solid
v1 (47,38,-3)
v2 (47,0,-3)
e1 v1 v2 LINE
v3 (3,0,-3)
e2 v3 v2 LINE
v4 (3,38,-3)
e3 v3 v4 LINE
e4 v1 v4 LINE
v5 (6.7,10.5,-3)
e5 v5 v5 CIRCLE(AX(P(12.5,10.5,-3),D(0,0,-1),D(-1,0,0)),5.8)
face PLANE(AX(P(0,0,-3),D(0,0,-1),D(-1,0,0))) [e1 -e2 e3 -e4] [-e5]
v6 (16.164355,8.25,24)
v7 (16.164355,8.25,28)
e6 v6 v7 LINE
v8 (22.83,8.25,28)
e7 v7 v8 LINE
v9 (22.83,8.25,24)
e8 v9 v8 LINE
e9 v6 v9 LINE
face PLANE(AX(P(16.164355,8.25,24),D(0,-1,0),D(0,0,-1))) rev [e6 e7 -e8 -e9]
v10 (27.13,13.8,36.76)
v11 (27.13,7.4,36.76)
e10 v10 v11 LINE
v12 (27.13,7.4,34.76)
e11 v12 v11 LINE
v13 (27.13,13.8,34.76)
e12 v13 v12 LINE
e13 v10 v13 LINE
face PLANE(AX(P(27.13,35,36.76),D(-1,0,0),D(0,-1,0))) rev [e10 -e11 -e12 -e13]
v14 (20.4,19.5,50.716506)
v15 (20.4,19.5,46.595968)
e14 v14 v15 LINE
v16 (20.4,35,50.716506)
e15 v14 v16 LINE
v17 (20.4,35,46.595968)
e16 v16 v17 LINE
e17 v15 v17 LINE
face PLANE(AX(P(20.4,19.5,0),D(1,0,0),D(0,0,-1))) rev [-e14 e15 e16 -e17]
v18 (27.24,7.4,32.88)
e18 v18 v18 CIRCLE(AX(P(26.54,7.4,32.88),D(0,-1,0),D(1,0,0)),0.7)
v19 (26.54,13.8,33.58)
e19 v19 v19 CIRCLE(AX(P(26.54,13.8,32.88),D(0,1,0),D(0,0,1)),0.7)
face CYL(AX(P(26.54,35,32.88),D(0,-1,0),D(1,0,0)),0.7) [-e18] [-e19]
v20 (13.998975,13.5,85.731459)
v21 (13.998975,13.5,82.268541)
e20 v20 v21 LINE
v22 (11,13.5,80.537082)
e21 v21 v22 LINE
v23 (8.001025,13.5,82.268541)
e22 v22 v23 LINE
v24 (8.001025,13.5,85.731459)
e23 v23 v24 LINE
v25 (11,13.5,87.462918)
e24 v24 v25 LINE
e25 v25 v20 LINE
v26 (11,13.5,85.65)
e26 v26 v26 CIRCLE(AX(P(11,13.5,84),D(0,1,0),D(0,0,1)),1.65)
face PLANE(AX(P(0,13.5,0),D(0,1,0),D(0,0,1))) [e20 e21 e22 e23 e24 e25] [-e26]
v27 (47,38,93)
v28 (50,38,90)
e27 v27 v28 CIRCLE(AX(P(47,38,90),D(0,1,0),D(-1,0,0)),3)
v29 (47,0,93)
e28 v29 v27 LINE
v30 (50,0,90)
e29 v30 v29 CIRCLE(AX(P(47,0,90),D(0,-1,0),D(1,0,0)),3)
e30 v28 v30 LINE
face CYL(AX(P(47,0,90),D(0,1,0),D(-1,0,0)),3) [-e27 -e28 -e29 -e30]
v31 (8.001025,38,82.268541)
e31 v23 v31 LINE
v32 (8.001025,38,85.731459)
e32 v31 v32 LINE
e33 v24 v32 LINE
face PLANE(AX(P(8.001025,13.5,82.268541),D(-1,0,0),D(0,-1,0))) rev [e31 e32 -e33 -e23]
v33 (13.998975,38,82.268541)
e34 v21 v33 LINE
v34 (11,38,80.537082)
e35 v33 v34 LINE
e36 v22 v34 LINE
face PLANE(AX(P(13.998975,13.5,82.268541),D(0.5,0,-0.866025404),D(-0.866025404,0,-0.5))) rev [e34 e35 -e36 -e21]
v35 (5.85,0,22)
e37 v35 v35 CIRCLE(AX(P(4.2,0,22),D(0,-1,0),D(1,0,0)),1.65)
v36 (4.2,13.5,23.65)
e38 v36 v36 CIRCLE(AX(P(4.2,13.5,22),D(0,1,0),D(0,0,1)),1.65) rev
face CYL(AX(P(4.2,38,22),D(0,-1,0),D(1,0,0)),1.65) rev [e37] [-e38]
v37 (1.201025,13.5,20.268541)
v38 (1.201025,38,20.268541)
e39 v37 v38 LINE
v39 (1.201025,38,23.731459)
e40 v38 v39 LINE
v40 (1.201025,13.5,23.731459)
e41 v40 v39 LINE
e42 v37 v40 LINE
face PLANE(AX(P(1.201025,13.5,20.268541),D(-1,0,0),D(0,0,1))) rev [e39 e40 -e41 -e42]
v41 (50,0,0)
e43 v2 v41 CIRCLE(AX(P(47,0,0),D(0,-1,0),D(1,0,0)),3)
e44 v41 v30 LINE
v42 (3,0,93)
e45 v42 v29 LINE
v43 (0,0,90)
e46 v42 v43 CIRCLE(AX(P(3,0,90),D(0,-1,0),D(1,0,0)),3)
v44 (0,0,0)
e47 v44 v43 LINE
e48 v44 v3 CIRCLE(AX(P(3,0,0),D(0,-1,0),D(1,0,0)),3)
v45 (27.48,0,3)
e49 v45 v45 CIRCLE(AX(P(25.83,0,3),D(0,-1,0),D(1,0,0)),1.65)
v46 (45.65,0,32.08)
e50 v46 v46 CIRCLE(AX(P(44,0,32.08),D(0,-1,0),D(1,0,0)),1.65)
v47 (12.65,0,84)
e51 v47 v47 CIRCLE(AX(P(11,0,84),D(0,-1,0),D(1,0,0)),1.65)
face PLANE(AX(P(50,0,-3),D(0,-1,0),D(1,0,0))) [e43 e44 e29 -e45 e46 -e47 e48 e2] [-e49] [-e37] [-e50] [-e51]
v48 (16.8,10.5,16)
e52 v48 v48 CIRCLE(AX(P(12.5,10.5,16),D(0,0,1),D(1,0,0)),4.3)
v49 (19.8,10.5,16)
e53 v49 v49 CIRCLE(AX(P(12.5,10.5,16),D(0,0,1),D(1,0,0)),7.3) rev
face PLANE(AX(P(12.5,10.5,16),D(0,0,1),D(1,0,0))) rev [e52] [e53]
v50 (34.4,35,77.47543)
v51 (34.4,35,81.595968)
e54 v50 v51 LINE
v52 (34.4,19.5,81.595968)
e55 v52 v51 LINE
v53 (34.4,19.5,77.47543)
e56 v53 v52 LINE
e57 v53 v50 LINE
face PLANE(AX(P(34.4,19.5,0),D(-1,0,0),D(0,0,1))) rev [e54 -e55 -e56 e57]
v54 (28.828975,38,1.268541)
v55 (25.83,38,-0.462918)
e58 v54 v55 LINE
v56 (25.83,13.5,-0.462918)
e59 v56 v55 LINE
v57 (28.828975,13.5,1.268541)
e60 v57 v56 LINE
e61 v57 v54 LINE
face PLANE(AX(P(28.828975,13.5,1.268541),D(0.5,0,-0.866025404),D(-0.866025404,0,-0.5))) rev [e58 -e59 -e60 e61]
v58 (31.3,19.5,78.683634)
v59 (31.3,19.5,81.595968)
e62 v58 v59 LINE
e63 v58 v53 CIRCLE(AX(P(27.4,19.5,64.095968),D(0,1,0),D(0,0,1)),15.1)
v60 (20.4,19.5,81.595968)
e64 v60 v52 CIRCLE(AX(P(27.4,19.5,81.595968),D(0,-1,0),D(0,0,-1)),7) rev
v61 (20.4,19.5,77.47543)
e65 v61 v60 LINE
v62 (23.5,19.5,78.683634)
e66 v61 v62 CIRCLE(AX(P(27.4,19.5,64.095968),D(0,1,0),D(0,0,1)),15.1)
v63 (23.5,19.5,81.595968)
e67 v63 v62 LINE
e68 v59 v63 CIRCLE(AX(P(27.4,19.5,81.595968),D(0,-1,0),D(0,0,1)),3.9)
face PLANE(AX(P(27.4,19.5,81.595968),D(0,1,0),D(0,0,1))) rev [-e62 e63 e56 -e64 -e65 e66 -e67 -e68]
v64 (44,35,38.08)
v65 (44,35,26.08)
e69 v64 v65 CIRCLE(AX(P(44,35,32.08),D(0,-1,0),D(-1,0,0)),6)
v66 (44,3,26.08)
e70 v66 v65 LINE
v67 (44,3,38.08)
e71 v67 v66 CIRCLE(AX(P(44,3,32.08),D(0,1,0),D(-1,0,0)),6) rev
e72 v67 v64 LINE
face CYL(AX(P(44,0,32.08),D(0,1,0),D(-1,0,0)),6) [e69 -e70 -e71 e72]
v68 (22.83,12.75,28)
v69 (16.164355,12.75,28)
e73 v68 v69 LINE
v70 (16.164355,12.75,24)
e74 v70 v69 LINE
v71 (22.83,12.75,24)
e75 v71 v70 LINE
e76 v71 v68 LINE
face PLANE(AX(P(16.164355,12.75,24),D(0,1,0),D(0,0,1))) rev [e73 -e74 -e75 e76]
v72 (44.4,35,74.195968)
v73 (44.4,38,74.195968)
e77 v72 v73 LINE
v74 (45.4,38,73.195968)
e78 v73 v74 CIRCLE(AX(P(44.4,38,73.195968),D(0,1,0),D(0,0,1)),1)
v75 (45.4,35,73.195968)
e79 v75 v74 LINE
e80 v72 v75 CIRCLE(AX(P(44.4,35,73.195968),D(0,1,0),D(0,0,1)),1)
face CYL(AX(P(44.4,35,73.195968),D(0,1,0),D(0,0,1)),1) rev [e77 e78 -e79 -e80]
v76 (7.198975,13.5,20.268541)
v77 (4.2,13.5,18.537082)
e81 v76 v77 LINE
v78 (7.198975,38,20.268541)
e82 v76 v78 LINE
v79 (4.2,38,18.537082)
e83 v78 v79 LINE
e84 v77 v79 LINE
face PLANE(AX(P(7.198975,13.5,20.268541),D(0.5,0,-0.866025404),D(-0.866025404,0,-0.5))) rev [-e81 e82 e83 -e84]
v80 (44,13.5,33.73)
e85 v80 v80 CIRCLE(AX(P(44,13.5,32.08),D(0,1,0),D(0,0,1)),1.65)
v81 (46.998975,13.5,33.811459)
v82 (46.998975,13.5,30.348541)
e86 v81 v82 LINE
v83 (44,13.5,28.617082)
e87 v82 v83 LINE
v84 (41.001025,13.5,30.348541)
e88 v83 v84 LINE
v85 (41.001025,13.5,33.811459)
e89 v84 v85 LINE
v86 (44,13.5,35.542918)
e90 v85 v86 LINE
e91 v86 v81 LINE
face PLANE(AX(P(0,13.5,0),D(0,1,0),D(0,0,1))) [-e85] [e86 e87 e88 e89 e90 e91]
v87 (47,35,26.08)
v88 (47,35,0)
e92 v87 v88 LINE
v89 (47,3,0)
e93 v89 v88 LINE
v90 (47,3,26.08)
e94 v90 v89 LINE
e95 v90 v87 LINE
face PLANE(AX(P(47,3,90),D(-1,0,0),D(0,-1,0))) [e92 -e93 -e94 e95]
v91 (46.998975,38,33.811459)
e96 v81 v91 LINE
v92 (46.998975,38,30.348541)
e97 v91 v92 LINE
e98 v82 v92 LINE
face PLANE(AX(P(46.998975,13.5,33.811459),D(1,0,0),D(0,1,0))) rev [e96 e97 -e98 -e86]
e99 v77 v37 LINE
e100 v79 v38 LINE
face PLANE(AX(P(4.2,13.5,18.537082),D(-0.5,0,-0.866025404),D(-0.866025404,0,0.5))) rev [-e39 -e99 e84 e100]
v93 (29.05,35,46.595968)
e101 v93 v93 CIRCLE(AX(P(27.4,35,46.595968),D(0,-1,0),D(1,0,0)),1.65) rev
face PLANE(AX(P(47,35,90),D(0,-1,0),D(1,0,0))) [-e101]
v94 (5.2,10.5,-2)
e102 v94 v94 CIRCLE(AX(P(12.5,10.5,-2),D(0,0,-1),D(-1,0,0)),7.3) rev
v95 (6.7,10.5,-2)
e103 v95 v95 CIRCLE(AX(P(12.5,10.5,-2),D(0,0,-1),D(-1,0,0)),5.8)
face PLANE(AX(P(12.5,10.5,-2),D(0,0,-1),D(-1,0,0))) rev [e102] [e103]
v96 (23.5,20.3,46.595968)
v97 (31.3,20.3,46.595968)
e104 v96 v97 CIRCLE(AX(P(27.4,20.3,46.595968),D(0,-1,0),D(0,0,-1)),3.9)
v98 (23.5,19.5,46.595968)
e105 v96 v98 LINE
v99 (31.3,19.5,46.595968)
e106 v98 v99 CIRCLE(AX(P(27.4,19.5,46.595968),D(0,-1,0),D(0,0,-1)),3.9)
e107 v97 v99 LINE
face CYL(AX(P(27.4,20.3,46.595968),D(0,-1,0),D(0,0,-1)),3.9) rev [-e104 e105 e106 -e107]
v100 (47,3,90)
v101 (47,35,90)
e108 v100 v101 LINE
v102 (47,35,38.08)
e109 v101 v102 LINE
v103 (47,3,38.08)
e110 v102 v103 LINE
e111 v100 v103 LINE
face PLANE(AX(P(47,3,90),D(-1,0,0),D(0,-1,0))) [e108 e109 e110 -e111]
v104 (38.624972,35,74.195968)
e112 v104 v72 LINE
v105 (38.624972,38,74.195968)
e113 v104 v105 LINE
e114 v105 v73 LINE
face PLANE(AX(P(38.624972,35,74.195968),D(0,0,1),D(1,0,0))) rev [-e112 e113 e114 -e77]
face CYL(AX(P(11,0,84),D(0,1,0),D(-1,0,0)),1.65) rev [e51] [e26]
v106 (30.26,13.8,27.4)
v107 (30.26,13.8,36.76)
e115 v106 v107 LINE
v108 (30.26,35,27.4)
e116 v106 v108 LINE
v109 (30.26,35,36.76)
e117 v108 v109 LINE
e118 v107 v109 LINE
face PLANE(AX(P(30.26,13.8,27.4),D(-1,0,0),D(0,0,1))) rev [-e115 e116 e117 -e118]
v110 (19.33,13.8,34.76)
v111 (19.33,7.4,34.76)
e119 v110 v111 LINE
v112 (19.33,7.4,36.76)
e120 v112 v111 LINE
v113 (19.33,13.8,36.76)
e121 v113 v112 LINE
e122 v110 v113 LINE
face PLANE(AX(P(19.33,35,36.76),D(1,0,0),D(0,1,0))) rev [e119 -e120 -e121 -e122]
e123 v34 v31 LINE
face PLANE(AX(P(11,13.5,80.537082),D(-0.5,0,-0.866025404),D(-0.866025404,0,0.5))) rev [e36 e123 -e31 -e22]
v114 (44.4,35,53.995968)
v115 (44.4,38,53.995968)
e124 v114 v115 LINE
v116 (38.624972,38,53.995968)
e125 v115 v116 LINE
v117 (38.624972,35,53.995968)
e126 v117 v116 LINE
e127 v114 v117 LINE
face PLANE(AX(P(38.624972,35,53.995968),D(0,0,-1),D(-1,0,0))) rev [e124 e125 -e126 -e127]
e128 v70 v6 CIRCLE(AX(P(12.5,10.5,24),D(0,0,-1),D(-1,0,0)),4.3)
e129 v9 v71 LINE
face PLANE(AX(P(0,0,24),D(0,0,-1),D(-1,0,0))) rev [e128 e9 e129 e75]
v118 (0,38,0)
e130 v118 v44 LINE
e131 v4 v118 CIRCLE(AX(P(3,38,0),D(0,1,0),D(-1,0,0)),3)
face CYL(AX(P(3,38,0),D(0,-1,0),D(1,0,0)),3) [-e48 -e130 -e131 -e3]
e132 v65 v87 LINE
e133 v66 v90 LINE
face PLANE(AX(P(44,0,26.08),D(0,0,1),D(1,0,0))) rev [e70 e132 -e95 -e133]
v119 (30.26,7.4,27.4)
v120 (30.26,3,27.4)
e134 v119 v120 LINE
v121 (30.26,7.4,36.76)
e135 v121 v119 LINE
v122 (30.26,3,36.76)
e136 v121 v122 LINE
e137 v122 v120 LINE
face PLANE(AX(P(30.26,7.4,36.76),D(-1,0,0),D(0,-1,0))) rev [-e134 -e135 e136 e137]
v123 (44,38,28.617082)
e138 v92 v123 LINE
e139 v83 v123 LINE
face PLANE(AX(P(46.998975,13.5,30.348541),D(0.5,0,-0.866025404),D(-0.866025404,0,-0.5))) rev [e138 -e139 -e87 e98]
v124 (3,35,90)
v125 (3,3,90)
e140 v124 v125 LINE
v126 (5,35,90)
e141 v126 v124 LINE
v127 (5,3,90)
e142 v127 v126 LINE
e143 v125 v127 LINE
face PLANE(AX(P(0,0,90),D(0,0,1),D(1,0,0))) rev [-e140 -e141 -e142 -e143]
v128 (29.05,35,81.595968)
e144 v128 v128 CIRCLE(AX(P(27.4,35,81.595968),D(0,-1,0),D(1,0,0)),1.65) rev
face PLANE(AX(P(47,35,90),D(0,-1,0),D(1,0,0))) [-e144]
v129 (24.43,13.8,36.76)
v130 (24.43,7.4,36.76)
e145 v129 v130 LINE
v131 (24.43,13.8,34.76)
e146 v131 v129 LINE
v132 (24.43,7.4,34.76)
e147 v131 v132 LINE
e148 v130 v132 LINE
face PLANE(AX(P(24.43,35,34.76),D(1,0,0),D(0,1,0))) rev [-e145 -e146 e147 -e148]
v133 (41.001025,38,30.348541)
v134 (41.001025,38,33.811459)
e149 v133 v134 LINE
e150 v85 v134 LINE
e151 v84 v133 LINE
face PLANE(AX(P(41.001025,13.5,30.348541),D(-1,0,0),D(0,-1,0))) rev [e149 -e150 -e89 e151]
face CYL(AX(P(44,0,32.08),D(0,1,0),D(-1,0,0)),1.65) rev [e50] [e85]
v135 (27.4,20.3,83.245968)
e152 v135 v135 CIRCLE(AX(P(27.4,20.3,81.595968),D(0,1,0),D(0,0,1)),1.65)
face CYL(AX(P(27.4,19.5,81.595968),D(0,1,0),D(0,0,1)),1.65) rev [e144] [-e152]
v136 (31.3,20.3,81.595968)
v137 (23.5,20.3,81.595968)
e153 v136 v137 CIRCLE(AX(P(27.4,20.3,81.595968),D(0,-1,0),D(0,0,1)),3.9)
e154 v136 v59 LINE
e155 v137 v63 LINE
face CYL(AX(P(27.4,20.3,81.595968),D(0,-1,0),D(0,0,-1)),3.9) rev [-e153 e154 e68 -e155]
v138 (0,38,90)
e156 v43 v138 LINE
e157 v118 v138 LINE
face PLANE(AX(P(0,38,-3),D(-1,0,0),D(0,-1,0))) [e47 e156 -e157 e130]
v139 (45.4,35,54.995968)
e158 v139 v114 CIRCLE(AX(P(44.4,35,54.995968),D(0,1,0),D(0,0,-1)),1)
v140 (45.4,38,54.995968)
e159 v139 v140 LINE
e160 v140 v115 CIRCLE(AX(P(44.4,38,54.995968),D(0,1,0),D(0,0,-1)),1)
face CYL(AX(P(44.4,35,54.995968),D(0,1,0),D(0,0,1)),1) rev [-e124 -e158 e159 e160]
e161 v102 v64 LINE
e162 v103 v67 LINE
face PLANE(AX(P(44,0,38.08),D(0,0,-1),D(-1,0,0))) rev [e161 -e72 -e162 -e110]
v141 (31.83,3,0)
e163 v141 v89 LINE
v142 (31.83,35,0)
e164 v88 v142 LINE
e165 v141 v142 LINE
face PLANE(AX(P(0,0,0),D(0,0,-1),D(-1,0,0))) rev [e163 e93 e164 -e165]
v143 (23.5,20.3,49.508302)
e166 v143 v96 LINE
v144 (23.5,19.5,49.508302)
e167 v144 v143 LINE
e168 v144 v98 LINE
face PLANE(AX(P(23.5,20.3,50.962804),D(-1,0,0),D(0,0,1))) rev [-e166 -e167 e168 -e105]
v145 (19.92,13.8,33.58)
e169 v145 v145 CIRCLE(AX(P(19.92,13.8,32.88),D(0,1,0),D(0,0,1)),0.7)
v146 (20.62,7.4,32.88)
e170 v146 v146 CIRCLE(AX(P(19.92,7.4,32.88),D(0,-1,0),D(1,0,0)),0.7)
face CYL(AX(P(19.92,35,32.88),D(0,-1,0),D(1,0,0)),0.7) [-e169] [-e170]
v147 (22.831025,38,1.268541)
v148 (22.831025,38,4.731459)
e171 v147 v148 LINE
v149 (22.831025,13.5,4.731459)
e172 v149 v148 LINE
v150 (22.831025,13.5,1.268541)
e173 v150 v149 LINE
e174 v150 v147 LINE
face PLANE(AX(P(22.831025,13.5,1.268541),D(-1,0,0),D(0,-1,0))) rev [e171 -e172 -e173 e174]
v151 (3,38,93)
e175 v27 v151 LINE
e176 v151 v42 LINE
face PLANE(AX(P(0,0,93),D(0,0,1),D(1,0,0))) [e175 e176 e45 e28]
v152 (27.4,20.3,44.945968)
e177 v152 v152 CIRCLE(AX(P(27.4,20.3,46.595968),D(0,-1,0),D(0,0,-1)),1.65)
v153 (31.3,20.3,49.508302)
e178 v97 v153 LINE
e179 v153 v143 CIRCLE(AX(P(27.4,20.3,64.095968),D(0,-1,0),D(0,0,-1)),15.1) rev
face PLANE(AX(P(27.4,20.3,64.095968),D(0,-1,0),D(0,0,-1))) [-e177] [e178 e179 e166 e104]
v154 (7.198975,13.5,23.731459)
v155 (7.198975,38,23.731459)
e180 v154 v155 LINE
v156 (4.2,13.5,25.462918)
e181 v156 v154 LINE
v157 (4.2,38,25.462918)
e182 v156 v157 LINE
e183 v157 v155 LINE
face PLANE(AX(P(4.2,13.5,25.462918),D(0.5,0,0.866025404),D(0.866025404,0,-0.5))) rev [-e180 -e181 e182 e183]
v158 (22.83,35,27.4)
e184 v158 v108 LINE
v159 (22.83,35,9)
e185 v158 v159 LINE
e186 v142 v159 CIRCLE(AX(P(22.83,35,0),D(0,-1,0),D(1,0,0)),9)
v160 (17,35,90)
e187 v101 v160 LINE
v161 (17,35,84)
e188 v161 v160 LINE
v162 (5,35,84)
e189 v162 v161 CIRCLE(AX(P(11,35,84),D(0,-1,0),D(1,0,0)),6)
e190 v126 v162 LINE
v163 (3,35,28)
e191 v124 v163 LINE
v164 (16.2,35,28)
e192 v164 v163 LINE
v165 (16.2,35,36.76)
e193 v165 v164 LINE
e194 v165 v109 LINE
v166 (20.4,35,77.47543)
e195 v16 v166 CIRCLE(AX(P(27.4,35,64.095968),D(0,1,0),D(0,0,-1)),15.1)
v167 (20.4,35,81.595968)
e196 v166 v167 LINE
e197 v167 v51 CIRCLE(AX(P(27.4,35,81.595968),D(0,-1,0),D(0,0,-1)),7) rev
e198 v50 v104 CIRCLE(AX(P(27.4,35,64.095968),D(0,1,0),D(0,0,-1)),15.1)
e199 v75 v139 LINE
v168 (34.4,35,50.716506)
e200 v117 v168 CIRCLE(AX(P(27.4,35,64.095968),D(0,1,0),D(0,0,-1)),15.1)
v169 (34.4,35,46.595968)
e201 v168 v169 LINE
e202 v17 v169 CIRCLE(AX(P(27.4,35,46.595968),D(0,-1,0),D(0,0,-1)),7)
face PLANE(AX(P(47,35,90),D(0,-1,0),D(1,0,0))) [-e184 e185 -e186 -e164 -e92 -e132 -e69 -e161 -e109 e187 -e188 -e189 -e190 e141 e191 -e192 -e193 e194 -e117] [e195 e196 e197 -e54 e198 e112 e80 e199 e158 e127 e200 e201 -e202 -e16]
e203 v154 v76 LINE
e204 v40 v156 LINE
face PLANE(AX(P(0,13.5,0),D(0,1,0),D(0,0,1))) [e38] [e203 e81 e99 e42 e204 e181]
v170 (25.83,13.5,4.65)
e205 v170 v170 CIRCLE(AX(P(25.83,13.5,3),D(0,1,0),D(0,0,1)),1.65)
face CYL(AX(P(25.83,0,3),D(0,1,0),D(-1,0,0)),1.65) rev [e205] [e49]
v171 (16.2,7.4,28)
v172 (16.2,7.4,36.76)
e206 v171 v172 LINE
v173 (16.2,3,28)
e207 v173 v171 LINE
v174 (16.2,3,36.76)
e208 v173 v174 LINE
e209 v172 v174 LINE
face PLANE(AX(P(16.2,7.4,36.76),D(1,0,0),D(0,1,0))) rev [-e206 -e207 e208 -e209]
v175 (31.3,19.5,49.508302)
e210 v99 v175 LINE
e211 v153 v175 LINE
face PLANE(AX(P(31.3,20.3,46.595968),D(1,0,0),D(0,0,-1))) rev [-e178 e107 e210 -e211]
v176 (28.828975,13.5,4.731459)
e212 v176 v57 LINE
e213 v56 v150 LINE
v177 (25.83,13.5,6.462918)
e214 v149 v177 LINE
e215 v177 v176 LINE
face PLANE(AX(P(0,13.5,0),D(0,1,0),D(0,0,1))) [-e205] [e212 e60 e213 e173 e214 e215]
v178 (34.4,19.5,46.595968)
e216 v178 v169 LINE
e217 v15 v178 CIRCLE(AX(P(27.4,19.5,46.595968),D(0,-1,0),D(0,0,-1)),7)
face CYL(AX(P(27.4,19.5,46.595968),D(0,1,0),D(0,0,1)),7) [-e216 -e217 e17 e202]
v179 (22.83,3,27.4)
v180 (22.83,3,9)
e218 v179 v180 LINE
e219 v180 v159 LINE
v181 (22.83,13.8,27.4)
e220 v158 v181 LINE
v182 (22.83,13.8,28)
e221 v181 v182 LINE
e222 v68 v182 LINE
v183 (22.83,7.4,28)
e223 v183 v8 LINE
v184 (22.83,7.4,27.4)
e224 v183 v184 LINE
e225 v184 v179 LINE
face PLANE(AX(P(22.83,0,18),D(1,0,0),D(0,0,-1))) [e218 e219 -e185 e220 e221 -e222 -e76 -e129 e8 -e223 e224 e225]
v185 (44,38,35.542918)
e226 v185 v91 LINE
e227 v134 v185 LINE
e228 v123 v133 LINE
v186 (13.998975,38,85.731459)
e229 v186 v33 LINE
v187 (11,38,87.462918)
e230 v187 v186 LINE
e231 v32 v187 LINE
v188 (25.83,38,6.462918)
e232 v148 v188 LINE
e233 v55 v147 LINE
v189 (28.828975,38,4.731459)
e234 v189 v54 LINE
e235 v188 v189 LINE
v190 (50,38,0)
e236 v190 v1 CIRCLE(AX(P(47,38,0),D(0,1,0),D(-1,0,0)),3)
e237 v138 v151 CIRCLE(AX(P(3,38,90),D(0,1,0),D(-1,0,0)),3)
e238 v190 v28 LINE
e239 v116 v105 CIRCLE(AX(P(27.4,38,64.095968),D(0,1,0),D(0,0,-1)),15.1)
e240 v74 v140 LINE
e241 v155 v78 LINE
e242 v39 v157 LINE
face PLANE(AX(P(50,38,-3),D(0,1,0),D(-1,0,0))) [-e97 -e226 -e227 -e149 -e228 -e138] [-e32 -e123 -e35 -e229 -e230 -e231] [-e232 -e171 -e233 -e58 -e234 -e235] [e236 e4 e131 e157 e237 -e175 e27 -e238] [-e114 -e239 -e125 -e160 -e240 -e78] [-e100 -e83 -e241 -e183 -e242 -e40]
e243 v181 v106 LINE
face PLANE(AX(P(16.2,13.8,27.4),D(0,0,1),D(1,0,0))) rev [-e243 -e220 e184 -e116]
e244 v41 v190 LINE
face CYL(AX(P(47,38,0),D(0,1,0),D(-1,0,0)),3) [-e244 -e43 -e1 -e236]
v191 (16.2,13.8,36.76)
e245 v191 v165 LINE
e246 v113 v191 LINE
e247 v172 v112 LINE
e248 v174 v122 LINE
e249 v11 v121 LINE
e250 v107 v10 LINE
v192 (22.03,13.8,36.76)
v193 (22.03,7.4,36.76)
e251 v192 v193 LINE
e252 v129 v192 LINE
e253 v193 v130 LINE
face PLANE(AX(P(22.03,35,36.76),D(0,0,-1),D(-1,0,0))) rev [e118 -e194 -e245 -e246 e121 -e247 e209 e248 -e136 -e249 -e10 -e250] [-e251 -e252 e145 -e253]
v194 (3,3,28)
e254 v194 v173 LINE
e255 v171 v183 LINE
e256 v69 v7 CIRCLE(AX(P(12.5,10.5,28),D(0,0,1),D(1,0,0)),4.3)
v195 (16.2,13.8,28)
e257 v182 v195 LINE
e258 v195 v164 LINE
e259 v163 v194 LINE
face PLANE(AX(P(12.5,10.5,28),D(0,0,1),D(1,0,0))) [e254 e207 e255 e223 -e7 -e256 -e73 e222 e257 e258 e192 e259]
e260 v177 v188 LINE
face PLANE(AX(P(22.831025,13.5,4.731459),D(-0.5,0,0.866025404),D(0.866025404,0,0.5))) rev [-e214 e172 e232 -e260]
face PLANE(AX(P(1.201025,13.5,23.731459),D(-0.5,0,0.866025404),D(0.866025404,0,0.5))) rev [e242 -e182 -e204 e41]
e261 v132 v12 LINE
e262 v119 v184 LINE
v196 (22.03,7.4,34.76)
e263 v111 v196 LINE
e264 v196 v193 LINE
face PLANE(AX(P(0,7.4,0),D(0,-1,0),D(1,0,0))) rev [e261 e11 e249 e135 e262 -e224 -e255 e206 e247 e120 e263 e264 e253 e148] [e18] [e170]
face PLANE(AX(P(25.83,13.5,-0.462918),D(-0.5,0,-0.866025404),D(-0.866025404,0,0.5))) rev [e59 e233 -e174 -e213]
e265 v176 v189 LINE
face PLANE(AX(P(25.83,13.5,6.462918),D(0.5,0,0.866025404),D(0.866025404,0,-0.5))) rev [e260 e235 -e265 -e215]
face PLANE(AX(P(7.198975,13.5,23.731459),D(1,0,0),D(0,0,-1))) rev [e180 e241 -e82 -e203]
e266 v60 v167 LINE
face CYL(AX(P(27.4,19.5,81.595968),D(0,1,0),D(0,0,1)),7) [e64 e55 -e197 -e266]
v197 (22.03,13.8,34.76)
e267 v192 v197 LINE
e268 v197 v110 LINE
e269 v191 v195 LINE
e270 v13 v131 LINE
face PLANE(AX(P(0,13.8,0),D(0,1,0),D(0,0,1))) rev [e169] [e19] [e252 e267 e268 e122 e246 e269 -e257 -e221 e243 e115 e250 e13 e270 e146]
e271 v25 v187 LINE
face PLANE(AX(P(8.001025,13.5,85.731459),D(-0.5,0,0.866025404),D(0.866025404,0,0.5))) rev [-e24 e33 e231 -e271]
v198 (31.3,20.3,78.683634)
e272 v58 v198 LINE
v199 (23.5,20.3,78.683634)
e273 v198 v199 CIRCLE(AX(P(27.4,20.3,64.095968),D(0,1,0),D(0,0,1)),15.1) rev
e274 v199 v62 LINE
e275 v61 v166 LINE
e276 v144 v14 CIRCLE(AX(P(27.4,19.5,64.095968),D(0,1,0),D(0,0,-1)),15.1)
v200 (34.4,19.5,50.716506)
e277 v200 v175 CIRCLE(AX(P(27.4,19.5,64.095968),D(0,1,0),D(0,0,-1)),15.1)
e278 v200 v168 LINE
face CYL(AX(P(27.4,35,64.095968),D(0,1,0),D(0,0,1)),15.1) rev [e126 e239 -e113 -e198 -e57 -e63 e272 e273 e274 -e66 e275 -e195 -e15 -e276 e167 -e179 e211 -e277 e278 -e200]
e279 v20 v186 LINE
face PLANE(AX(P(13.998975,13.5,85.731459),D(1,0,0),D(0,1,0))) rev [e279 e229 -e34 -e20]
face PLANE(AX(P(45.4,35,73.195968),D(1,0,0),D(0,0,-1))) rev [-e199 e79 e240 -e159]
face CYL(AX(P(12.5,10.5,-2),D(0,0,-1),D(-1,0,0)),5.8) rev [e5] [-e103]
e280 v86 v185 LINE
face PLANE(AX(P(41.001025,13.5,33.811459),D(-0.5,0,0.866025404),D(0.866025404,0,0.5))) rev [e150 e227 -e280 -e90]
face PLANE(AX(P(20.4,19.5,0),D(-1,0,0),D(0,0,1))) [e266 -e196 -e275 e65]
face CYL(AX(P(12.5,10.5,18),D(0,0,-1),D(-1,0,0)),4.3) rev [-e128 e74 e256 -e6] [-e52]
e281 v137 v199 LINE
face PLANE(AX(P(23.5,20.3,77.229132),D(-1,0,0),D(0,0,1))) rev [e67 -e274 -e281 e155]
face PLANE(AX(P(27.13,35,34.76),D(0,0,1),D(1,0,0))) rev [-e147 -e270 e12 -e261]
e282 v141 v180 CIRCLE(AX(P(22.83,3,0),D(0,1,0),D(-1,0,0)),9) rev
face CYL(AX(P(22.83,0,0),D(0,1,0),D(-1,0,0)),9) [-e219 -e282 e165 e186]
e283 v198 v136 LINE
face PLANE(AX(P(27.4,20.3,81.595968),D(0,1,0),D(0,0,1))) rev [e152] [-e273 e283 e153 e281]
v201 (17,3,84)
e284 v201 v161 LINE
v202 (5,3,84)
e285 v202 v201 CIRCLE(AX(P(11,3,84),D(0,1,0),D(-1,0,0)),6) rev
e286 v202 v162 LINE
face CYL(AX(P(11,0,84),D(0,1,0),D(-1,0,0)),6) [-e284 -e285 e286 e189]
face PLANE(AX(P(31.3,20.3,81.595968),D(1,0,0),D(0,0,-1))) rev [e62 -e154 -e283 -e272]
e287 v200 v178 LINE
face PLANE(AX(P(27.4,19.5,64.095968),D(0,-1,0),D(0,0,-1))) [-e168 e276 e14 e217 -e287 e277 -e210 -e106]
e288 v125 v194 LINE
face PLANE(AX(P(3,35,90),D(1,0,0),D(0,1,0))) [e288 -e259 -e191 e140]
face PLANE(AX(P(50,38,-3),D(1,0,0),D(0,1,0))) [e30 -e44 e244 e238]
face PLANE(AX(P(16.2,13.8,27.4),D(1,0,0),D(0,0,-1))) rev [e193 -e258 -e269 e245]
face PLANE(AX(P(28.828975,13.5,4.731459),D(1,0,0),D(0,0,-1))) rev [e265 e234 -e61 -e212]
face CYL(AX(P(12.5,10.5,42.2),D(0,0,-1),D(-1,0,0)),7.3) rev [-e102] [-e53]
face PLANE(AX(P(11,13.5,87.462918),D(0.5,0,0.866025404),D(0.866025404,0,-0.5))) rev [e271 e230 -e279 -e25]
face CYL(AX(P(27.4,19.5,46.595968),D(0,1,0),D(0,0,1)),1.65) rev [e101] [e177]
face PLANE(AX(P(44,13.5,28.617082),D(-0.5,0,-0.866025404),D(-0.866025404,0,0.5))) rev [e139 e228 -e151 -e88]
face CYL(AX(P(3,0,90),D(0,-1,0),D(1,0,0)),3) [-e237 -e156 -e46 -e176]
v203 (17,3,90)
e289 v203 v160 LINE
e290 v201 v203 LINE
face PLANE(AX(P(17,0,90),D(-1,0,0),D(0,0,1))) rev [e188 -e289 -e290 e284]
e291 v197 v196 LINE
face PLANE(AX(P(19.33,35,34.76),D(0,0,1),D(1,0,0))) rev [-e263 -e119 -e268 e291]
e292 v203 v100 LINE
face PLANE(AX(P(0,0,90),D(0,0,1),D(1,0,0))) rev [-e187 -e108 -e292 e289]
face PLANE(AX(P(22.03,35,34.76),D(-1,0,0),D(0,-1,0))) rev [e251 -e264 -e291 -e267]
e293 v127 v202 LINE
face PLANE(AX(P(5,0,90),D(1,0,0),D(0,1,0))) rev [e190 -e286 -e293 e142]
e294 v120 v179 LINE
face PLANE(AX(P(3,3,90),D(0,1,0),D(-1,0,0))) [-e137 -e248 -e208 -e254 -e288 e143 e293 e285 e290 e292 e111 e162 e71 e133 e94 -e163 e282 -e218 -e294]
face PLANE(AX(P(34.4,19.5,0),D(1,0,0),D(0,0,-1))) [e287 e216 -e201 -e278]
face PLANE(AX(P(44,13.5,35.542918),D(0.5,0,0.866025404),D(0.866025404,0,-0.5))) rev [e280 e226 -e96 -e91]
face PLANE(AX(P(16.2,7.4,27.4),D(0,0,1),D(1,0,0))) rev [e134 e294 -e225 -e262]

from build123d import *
from build123d.topology import SkipClean

# Parameters (mm, degrees)
SKETCH_1_W               = 50
SKETCH_1_H               = 38
EXTRUDE_1_DEPTH          = 3
SKETCH_2_W               = 50
SKETCH_2_H               = 38
SKETCH_2_W_2             = 44
SKETCH_2_H_2             = 32
EXTRUDE_2_DEPTH          = 90
SKETCH_4_R               = 7.3
CUT_EXTRUDE_1_DEPTH      = 45.2
SKETCH_5_R               = 10.3
SKETCH_5_R_2             = 7.3
EXTRUDE_3_DEPTH          = 16
SKETCH_6_R               = 8.3
SKETCH_6_R_2             = 5.8
EXTRUDE_5_DEPTH          = 1
SKETCH_7_R               = 4.3
EXTRUDE_6_DEPTH          = 2
SKETCH_8_R               = 6.3
SKETCH_8_R_2             = 4.3
EXTRUDE_7_DEPTH          = 10
SKETCH_9_W               = 2.635644668
SKETCH_9_H               = 4.5
CUT_EXTRUDE_2_DEPTH      = 4
SKETCH_10_R              = 0.7
SKETCH_10_W              = 2.7
SKETCH_10_H              = 2
EXTRUDE_8_DEPTH          = 32
SKETCH_11_W              = 14.06
SKETCH_11_H              = 9.36
EXTRUDE_9_DEPTH          = 4.4
SKETCH_12_W              = 14.06
SKETCH_12_H              = 9.36
EXTRUDE_10_DEPTH         = 21.2
CUT_EXTRUDE_3_DEPTH      = 3
SKETCH_14_R              = 1.65
EXTRUDE_11_DEPTH         = 15.5
EXTRUDE_12_DEPTH         = 15.5
CUT_EXTRUDE_4_DEPTH      = 0.8
EXTRUDE_13_DEPTH         = 18
SKETCH_18_W              = 19.83
SKETCH_18_H              = 32
SKETCH_18_R              = 6.3
EXTRUDE_14_DEPTH         = 10
SKETCH_19_W              = 4.445486426
SKETCH_19_H              = 4.5
CUT_EXTRUDE_5_DEPTH      = 4
EXTRUDE_16_REACH         = 110.743
SKETCH_23_R              = 1.65
CUT_EXTRUDE_7_DEPTH      = 109.742815855
CUT_EXTRUDE_7_DEPTH_BACK = 109.742815855
SKETCH_25_R              = 1.65
CUT_EXTRUDE_8_DEPTH      = 24.5
SKETCH_29_W              = 50
SKETCH_29_H              = 38
EXTRUDE_17_DEPTH         = 3
FILLET_1_R               = 3


with BuildPart() as part:
    # 草图1 → 凸台-拉伸1 (new body)
    with BuildSketch(Plane.XY):
        with Locations((25, 19)):
            Rectangle(SKETCH_1_W, SKETCH_1_H)
    extrude(amount=-EXTRUDE_1_DEPTH)

    # 草图2 → 凸台-拉伸2 (add)
    with BuildSketch(Plane.XY):
        with Locations((25, 19)):
            Rectangle(SKETCH_2_W, SKETCH_2_H)
        with Locations((25, 19)):
            Rectangle(SKETCH_2_W_2, SKETCH_2_H_2, mode=Mode.SUBTRACT)
    extrude(amount=EXTRUDE_2_DEPTH)

    # 草图4 → 切除-拉伸1 (cut)
    with BuildSketch(Plane(origin=(0, 0, -3), x_dir=(-1, 0, 0), z_dir=(0, 0, -1))):
        with Locations((-12.5, 10.5)):
            Circle(SKETCH_4_R)
    extrude(amount=-CUT_EXTRUDE_1_DEPTH, mode=Mode.SUBTRACT)

    # 草图5 → 凸台-拉伸3 (add)
    with BuildSketch(Plane.XY):
        with Locations((12.5, 10.5)):
            Circle(SKETCH_5_R)
        with Locations(Location((12.5, 10.5, 0), (0, 0, 180))):
            Circle(SKETCH_5_R_2, mode=Mode.SUBTRACT)
    extrude(amount=EXTRUDE_3_DEPTH)

    # 草图6 → 凸台-拉伸5 (add)
    with BuildSketch(Plane(origin=(0, 0, -3), x_dir=(-1, 0, 0), z_dir=(0, 0, -1))):
        with Locations((-12.5, 10.5)):
            Circle(SKETCH_6_R)
        with Locations((-12.5, 10.5)):
            Circle(SKETCH_6_R_2, mode=Mode.SUBTRACT)
    extrude(amount=-EXTRUDE_5_DEPTH)

    # 草图7 → 凸台-拉伸6 (add)
    with BuildSketch(Plane.XY.offset(16)):
        with BuildLine():
            Line((5.440254962, 3), (19.559745038, 3))
            ThreePointArc((19.559745038, 3), (18.368221419, 18.964867239), (3, 14.479949748))
            Line((3, 14.479949748), (3, 6.520050252))
            ThreePointArc((3, 6.520050252), (4.035132761, 4.631778581), (5.440254962, 3))
        make_face()
        with Locations((12.5, 10.5)):
            Circle(SKETCH_7_R, mode=Mode.SUBTRACT)
    extrude(amount=EXTRUDE_6_DEPTH)

    # 草图8 → 凸台-拉伸7 (add)
    with BuildSketch(Plane.XY.offset(18)):
        with Locations((12.5, 10.5)):
            Circle(SKETCH_8_R)
        with Locations((12.5, 10.5)):
            Circle(SKETCH_8_R_2, mode=Mode.SUBTRACT)
    extrude(amount=EXTRUDE_7_DEPTH)

    # 草图9 → 切除-拉伸2 (cut)
    with BuildSketch(Plane.XY.offset(28)):
        with Locations((17.482177666, 10.5)):
            Rectangle(SKETCH_9_W, SKETCH_9_H)
    extrude(amount=-CUT_EXTRUDE_2_DEPTH, mode=Mode.SUBTRACT)

    # 草图10 → 凸台-拉伸8 (add)
    with BuildSketch(Plane(origin=(0, 3, 0), x_dir=(1, 0, 0), z_dir=(0, 1, 0))):
        with Locations(Location((19.92, -32.88, 0), (0, 0, 180))):
            Circle(SKETCH_10_R)
        with Locations(Location((26.54, -32.88, 0), (0, 0, 180))):
            Circle(SKETCH_10_R)
        with Locations((20.68, -35.76)):
            Rectangle(SKETCH_10_W, SKETCH_10_H)
        with Locations((25.78, -35.76)):
            Rectangle(SKETCH_10_W, SKETCH_10_H)
    extrude(amount=EXTRUDE_8_DEPTH)

    # 草图11 → 凸台-拉伸9 (add)
    with BuildSketch(Plane(origin=(0, 3, 0), x_dir=(1, 0, 0), z_dir=(0, 1, 0))):
        with Locations((23.23, -32.08)):
            Rectangle(SKETCH_11_W, SKETCH_11_H)
    extrude(amount=EXTRUDE_9_DEPTH)

    # 草图12 → 凸台-拉伸10 (add)
    with BuildSketch(Plane.XZ.offset(-35)):
        with Locations((23.23, 32.08)):
            Rectangle(SKETCH_12_W, SKETCH_12_H)
    extrude(amount=EXTRUDE_10_DEPTH)

    # 草图13 → 切除-拉伸3 (cut)
    with BuildSketch(Plane(origin=(0, 38, 0), x_dir=(1, 0, 0), z_dir=(0, 1, 0))):
        with BuildLine():
            Line((38.62497216, -74.195968058), (44.4, -74.195968058))
            ThreePointArc((44.4, -74.195968058), (45.107106781, -73.903074839), (45.4, -73.195968058))
            Line((45.4, -73.195968058), (45.4, -54.995968058))
            ThreePointArc((45.4, -54.995968058), (45.107106781, -54.288861277), (44.4, -53.995968058))
            Line((44.4, -53.995968058), (38.62497216, -53.995968058))
            ThreePointArc((38.62497216, -53.995968058), (12.3, -64.095968058), (38.62497216, -74.195968058))
        make_face()
    extrude(amount=-CUT_EXTRUDE_3_DEPTH, mode=Mode.SUBTRACT)

    # 草图14 → 凸台-拉伸11 (add)
    # profile 1 of 2: a face of its own
    with SkipClean():  # the faces are left unmerged after this step: merging them gives an invalid solid
        with BuildSketch(Plane.XZ.offset(-35)):
            with BuildLine():
                Line((23.9, 46.595968058), (23.9, 49.407196837))
                ThreePointArc((23.9, 49.407196837), (27.4, 48.995968058), (30.9, 49.407196837))
                Line((30.9, 49.407196837), (30.9, 46.595968058))
                ThreePointArc((30.9, 46.595968058), (27.4, 43.095968058), (23.9, 46.595968058))
            make_face()
            with Locations((27.4, 46.595968058)):
                Circle(SKETCH_14_R, mode=Mode.SUBTRACT)
        # profile 2 of 2: a face of its own
        with BuildSketch(Plane.XZ.offset(-35)):
            with BuildLine():
                Line((30.9, 81.595968058), (30.9, 78.78473928))
                ThreePointArc((30.9, 78.78473928), (27.4, 79.195968058), (23.9, 78.78473928))
                Line((23.9, 78.78473928), (23.9, 81.595968058))
                ThreePointArc((23.9, 81.595968058), (27.4, 85.095968058), (30.9, 81.595968058))
            make_face()
            with Locations(Location((27.4, 81.595968058, 0), (0, 0, 90))):
                Circle(SKETCH_14_R, mode=Mode.SUBTRACT)
        extrude(amount=EXTRUDE_11_DEPTH)

    # 草图15 → 凸台-拉伸12 (add)
    with SkipClean():  # the faces are left unmerged after this step: merging them gives an invalid solid
        with BuildSketch(Plane.XZ.offset(-35)):
            with BuildLine():
                ThreePointArc((23.9, 49.407196837), (22.109340992, 49.953163271), (20.4, 50.716506186))
                Line((20.4, 50.716506186), (20.4, 46.595968058))
                ThreePointArc((20.4, 46.595968058), (27.4, 39.595968058), (34.4, 46.595968058))
                Line((34.4, 46.595968058), (34.4, 50.716506186))
                ThreePointArc((34.4, 50.716506186), (32.690659008, 49.953163271), (30.9, 49.407196837))
                Line((30.9, 49.407196837), (30.9, 46.595968058))
                ThreePointArc((30.9, 46.595968058), (27.4, 43.095968058), (23.9, 46.595968058))
                Line((23.9, 46.595968058), (23.9, 49.407196837))
            make_face()
            with BuildLine():
                Line((20.4, 81.595968058), (20.4, 77.475429931))
                ThreePointArc((20.4, 77.475429931), (22.109340992, 78.238772846), (23.9, 78.78473928))
                Line((23.9, 78.78473928), (23.9, 81.595968058))
                ThreePointArc((23.9, 81.595968058), (27.4, 85.095968058), (30.9, 81.595968058))
                Line((30.9, 81.595968058), (30.9, 78.78473928))
                ThreePointArc((30.9, 78.78473928), (32.690659008, 78.238772846), (34.4, 77.475429931))
                Line((34.4, 77.475429931), (34.4, 81.595968058))
                ThreePointArc((34.4, 81.595968058), (27.4, 88.595968058), (20.4, 81.595968058))
            make_face()
        extrude(amount=EXTRUDE_12_DEPTH)

    # 草图16 → 切除-拉伸4 (cut)
    with SkipClean():  # the faces are left unmerged after this step: merging them gives an invalid solid
        with BuildSketch(Plane.XZ.offset(-19.5)):
            with BuildLine():
                Line((31.3, 81.595968058), (31.3, 77.229132186))
                ThreePointArc((31.3, 77.229132186), (27.4, 77.795968058), (23.5, 77.229132186))
                Line((23.5, 77.229132186), (23.5, 81.595968058))
                ThreePointArc((23.5, 81.595968058), (27.4, 85.495968058), (31.3, 81.595968058))
            make_face()
            with BuildLine():
                Line((31.3, 46.595968058), (31.3, 50.962803931))
                ThreePointArc((31.3, 50.962803931), (27.4, 50.395968058), (23.5, 50.962803931))
                Line((23.5, 50.962803931), (23.5, 46.595968058))
                ThreePointArc((23.5, 46.595968058), (27.4, 42.695968058), (31.3, 46.595968058))
            make_face()
        extrude(amount=-CUT_EXTRUDE_4_DEPTH, mode=Mode.SUBTRACT)

    # 草图17 → 凸台-拉伸13 (add)
    with SkipClean():  # the faces are left unmerged after this step: merging them gives an invalid solid
        with BuildSketch(Plane.XY):
            with BuildLine():
                Line((22.83, 3), (22.83, 10.539153682))
                Line((22.83, 10.539153682), (22.83, 35))
                Line((22.83, 35), (3, 35))
                Line((3, 35), (3, 14.479949748))
                ThreePointArc((3, 14.479949748), (18.368221419, 18.964867239), (19.559745038, 3))
                Line((19.559745038, 3), (22.83, 3))
            make_face()
            with BuildLine():
                Line((5.440254962, 3), (3, 3))
                Line((3, 3), (3, 6.520050252))
                ThreePointArc((3, 6.520050252), (4.035132761, 4.631778581), (5.440254962, 3))
            make_face()
        extrude(amount=EXTRUDE_13_DEPTH)

    # 草图18 → 凸台-拉伸14 (add)
    with SkipClean():  # the faces are left unmerged after this step: merging them gives an invalid solid
        with BuildSketch(Plane.XY.offset(18)):
            with Locations((12.915, 19)):
                Rectangle(SKETCH_18_W, SKETCH_18_H)
            with Locations((12.5, 10.5)):
                Circle(SKETCH_18_R, mode=Mode.SUBTRACT)
        extrude(amount=EXTRUDE_14_DEPTH)

    # 草图19 → 切除-拉伸5 (cut)
    with SkipClean():  # the faces are left unmerged after this step: merging them gives an invalid solid
        with BuildSketch(Plane.XY.offset(28)):
            with Locations((20.607256787, 10.5)):
                Rectangle(SKETCH_19_W, SKETCH_19_H)
        extrude(amount=-CUT_EXTRUDE_5_DEPTH, mode=Mode.SUBTRACT)

    # 草图23 → 凸台-拉伸16 (add, up to next)
    with BuildSketch(Plane.XZ.offset(-35), mode=Mode.PRIVATE) as extrude_16_sk1:
        with BuildLine():
            Line((22.83, 0), (22.83, 9))
            ThreePointArc((22.83, 9), (29.193961031, 6.363961031), (31.83, 0))
            Line((31.83, 0), (22.83, 0))
        make_face()
        with Locations(Location((25.83, 3, 0), (0, 0, 180))):
            Circle(SKETCH_23_R, mode=Mode.SUBTRACT)
    extrude_16_tool1 = extrude(extrude_16_sk1.sketch, amount=EXTRUDE_16_REACH, mode=Mode.PRIVATE) - part.part
    # 草图23 → 凸台-拉伸16 (add, up to next)
    with BuildSketch(Plane.XZ.offset(-35), mode=Mode.PRIVATE) as extrude_16_sk2:
        with BuildLine():
            Line((44, 26.08), (47, 26.08))
            Line((47, 26.08), (47, 38.08))
            Line((47, 38.08), (44, 38.08))
            ThreePointArc((44, 38.08), (38, 32.08), (44, 26.08))
        make_face()
        with Locations(Location((44, 32.08, 0), (0, 0, 180))):
            Circle(SKETCH_23_R, mode=Mode.SUBTRACT)
    extrude_16_tool2 = extrude(extrude_16_sk2.sketch, amount=EXTRUDE_16_REACH, mode=Mode.PRIVATE) - part.part
    # 草图23 → 凸台-拉伸16 (add, up to next)
    with BuildSketch(Plane.XZ.offset(-35), mode=Mode.PRIVATE) as extrude_16_sk3:
        with BuildLine():
            Line((5, 90), (5, 84))
            ThreePointArc((5, 84), (11, 78), (17, 84))
            Line((17, 84), (17, 90))
            Line((17, 90), (5, 90))
        make_face()
        with Locations(Location((11, 84, 0), (0, 0, 180))):
            Circle(SKETCH_23_R, mode=Mode.SUBTRACT)
    extrude_16_tool3 = extrude(extrude_16_sk3.sketch, amount=EXTRUDE_16_REACH, mode=Mode.PRIVATE) - part.part
    add(extrude_16_tool1.solids().sort_by_distance((27.33, 35, 0.127279))[0])
    add(extrude_16_tool2.solids().sort_by_distance((45.5, 35, 26.23))[0])
    add(extrude_16_tool3.solids().sort_by_distance((11, 35, 78.169706))[0])

    # 草图25 → 切除-拉伸7 (cut, two sides: drawn at the far end of the back side and taken through both)
    with BuildSketch(Plane.XZ.offset(-35).offset(-CUT_EXTRUDE_7_DEPTH_BACK)):
        with Locations((4.2, 22)):
            Circle(SKETCH_25_R)
        with Locations((25.83, 3)):
            Circle(SKETCH_25_R)
        with Locations((44, 32.08)):
            Circle(SKETCH_25_R)
        with Locations((11, 84)):
            Circle(SKETCH_25_R)
    extrude(amount=CUT_EXTRUDE_7_DEPTH + CUT_EXTRUDE_7_DEPTH_BACK, mode=Mode.SUBTRACT)

    # 草图26 → 切除-拉伸8 (cut)
    with SkipClean():  # the faces are left unmerged after this step: merging them gives an invalid solid
        with BuildSketch(Plane(origin=(0, 38, 0), x_dir=(1, 0, 0), z_dir=(0, 1, 0))):
            Polygon((4.2, -18.537081721), (1.201024799, -20.268540861), (1.201024799, -23.731459139), (4.2, -25.462918279), (7.198975201, -23.731459139), (7.198975201, -20.268540861), align=None)
            Polygon((25.83, -6.462918279), (28.828975201, -4.731459139), (28.828975201, -1.268540861), (25.83, 0.462918279), (22.831024799, -1.268540861), (22.831024799, -4.731459139), align=None)
            Polygon((11, -80.537081721), (8.001024799, -82.268540861), (8.001024799, -85.731459139), (11, -87.462918279), (13.998975201, -85.731459139), (13.998975201, -82.268540861), align=None)
            Polygon((44, -28.617081721), (41.001024799, -30.348540861), (41.001024799, -33.811459139), (44, -35.542918279), (46.998975201, -33.811459139), (46.998975201, -30.348540861), align=None)
        extrude(amount=-CUT_EXTRUDE_8_DEPTH, mode=Mode.SUBTRACT)

    # 草图29 → 凸台-拉伸17 (add)
    with SkipClean():  # the faces are left unmerged after this step: merging them gives an invalid solid
        with BuildSketch(Plane.XY.offset(90)):
            with Locations((25, 19)):
                Rectangle(SKETCH_29_W, SKETCH_29_H)
        extrude(amount=EXTRUDE_17_DEPTH)

    # 圆角1
    fillet_1_edges = [part.edges().sort_by_distance(p)[0] for p in [
        (0, 19, -3),
        (50, 19, -3),
        (0, 19, 93),
        (50, 19, 93),
    ]]
    fillet(fillet_1_edges, radius=FILLET_1_R - 0.0001)  # a hair under: the kernel refuses the full size


solid = part.part
